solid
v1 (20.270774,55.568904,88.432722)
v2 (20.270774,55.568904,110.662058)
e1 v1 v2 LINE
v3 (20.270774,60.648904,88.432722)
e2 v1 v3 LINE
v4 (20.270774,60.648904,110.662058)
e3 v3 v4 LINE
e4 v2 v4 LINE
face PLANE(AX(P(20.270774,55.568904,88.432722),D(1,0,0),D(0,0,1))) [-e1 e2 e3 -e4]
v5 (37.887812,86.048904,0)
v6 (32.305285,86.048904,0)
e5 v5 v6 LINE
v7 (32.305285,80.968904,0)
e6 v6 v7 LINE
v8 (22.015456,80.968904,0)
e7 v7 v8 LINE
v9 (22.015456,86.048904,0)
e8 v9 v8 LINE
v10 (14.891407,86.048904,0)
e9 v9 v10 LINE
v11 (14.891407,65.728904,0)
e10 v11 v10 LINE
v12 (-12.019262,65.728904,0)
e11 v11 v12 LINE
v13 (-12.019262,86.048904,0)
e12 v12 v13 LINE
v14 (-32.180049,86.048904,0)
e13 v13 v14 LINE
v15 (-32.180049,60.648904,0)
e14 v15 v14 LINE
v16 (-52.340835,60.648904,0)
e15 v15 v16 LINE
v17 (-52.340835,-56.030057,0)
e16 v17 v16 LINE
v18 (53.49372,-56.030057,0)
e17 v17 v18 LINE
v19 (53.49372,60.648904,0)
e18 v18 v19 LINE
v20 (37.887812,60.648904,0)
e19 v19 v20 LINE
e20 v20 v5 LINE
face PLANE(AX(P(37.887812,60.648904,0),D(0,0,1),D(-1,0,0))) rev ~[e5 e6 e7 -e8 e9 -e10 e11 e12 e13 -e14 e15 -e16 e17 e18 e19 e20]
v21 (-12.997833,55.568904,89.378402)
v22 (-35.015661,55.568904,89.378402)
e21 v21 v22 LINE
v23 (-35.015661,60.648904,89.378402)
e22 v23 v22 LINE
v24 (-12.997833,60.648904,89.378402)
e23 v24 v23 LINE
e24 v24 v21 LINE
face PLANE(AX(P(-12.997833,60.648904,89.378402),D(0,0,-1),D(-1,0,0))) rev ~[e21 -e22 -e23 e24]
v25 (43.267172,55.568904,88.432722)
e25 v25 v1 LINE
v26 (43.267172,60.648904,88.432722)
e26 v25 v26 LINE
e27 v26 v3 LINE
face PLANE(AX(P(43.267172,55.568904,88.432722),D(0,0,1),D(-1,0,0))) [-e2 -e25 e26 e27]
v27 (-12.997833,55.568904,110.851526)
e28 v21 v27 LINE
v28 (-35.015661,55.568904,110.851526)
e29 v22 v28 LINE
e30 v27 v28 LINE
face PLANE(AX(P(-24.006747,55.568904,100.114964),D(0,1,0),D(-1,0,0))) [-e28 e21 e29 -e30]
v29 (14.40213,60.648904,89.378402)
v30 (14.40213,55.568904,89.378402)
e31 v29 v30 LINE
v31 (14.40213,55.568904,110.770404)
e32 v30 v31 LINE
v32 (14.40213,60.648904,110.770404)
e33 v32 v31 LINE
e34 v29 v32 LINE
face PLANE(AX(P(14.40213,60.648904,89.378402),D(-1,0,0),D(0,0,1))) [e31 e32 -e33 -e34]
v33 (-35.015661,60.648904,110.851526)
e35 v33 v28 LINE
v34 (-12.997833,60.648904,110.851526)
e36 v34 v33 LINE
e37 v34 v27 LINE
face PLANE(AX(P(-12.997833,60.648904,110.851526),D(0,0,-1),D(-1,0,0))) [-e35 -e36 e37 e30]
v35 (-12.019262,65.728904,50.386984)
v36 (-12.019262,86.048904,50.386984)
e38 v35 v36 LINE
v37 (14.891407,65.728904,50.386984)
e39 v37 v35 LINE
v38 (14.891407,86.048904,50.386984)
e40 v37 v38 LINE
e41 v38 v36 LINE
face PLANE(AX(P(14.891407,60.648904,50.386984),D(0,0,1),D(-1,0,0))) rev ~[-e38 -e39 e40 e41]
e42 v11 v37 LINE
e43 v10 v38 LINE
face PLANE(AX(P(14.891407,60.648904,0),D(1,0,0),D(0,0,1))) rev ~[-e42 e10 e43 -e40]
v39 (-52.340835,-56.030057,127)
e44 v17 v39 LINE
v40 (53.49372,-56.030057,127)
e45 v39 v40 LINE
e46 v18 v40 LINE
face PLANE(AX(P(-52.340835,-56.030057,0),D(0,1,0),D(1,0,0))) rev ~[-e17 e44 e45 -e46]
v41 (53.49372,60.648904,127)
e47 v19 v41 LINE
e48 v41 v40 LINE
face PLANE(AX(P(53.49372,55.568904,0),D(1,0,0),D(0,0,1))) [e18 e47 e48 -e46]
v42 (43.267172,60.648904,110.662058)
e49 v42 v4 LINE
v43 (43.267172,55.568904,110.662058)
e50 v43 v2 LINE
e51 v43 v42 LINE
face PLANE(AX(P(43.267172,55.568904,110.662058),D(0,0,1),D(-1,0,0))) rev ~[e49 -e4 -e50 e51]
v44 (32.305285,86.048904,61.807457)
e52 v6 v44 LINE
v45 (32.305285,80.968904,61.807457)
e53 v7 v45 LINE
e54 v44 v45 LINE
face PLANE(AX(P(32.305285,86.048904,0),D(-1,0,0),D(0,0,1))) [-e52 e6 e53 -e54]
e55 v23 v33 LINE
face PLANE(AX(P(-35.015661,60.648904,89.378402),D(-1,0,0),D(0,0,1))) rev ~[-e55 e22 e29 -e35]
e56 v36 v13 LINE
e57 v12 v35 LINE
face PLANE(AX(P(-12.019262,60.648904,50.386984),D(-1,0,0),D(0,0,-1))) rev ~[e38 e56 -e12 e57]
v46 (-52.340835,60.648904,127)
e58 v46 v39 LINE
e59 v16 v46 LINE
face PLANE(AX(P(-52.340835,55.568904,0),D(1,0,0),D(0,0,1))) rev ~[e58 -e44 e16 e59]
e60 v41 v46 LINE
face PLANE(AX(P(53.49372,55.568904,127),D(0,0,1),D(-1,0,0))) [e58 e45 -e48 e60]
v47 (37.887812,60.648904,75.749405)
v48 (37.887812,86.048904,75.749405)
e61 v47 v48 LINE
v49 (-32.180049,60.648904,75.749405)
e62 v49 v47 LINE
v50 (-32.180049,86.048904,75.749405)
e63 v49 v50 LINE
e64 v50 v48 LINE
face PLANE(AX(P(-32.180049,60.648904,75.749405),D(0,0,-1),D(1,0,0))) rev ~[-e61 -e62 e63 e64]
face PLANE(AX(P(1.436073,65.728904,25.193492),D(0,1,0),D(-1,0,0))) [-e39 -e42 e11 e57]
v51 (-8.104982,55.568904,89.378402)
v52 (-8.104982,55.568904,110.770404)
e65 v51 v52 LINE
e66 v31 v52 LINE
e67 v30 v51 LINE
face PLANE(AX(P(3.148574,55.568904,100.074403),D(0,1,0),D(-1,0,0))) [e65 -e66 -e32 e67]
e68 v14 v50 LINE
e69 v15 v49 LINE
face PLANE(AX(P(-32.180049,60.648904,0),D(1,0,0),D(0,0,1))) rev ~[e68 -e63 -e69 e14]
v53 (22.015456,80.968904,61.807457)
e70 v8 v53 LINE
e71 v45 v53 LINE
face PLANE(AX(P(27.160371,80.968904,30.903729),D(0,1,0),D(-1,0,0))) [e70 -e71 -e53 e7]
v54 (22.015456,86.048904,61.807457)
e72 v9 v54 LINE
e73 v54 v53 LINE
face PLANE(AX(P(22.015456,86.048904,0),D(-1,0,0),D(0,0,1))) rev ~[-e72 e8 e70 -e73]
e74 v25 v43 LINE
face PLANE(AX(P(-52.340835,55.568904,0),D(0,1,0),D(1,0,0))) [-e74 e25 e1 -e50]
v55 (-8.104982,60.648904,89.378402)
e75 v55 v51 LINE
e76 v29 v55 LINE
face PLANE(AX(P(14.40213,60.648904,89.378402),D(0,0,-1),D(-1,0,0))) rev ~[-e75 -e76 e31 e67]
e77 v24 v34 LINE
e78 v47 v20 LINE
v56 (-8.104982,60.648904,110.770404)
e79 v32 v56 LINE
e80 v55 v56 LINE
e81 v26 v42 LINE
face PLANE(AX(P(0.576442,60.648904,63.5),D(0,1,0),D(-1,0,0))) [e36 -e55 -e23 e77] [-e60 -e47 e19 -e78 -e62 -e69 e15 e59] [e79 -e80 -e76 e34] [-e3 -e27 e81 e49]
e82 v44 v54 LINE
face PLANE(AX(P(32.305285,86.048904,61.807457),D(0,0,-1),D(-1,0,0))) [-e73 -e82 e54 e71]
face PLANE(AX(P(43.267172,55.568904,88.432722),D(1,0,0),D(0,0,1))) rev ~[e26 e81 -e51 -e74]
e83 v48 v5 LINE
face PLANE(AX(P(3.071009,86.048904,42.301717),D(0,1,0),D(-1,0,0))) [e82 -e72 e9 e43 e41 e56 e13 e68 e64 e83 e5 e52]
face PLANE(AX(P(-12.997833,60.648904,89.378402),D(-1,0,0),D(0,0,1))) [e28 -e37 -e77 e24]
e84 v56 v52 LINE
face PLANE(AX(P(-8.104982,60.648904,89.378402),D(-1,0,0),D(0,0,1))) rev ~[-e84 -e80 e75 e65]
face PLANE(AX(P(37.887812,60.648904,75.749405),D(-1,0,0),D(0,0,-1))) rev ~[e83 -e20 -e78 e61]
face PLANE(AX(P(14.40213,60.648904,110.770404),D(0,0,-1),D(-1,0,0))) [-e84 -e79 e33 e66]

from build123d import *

# Parameters (mm, degrees)
F0_W      = 105.8345548809
F0_H      = 111.5989610553
F1_DEPTH  = 127
F2_W      = 105.8345548809
F2_H      = 127
F2_W_2    = 22.996397689
F2_H_2    = 22.2293362021
F3_DEPTH  = 5.08
F4_W      = 26.9106691703
F4_H      = 50.3869839013
F5_DEPTH  = 5.08
F7_DEPTH  = 25.4
F8_W      = 22.5071115419
F8_H      = 21.3920027018
F9_DEPTH  = 5.08
F10_W     = 22.0178281888
F10_H     = 21.4731246233
F11_DEPTH = 5.08
F12_W     = 10.2898292243
F12_H     = 61.8074573576
F13_DEPTH = 5.08


with BuildPart() as f1:
    # F0 (on Top) → F1 (new body)
    with BuildSketch(Plane.XY):
        with Locations((0.5764421076, -0.230576843)):
            Rectangle(F0_W, F0_H)
    extrude(amount=F1_DEPTH)

    # F2 (on face) → F3 (join)
    with BuildSketch(Plane(origin=(0, 55.5689036846, 0), x_dir=(-1, 0, 0), z_dir=(0, 1, 0))):
        with Locations((-0.5764421076, 63.5)):
            Rectangle(F2_W, F2_H)
        with Locations((-31.7689729854, 99.5473898947)):
            Rectangle(F2_W_2, F2_H_2, mode=Mode.SUBTRACT)
    extrude(amount=F3_DEPTH)

    # F4 (on face) → F5 (join)
    with BuildSketch(Plane(origin=(0, 60.6489036846, 0), x_dir=(-1, 0, 0), z_dir=(0, 1, 0))):
        with Locations((-1.4360728674, 25.1934919506)):
            Rectangle(F4_W, F4_H)
    extrude(amount=F5_DEPTH)

    # F6 (on face) → F7 (join)
    with BuildSketch(Plane(origin=(0, 60.6489036846, 0), x_dir=(-1, 0, 0), z_dir=(0, 1, 0))):
        Polygon((-37.8878116608, 0), (-29.5699629933, 0), (-29.5699629933, 55.8542273939), (22.2942437977, 55.8542273939), (22.2942437977, 0), (32.1800485253, 0), (32.1800485253, 75.7494047284), (-37.8878116608, 75.7494047284), align=None)
        Polygon((-29.5699629933, 55.8542273939), (-29.5699629933, 0), (-14.8914074525, 0), (-14.8914074525, 50.3869839013), (12.0192617178, 50.3869839013), (12.0192617178, 0), (22.2942437977, 0), (22.2942437977, 55.8542273939), align=None)
    extrude(amount=F7_DEPTH)

    # F8 (on face) → F9 (cut)
    with BuildSketch(Plane(origin=(0, 60.6489036846, 0), x_dir=(-1, 0, 0), z_dir=(0, 1, 0))):
        with Locations((-3.1485739164, 100.074402988)):
            Rectangle(F8_W, F8_H)
    extrude(amount=-F9_DEPTH, mode=Mode.SUBTRACT)

    # F10 (on face) → F11 (cut)
    with BuildSketch(Plane(origin=(0, 60.6489036846, 0), x_dir=(-1, 0, 0), z_dir=(0, 1, 0))):
        with Locations((24.006747175, 100.1149639487)):
            Rectangle(F10_W, F10_H)
    extrude(amount=-F11_DEPTH, mode=Mode.SUBTRACT)

    # F12 (on face) → F13 (cut)
    with BuildSketch(Plane(origin=(0, 86.0489036846, 0), x_dir=(-1, 0, 0), z_dir=(0, 1, 0))):
        with Locations((-27.1603707224, 30.9037286788)):
            Rectangle(F12_W, F12_H)
    extrude(amount=-F13_DEPTH, mode=Mode.SUBTRACT)


solid = f1.part
